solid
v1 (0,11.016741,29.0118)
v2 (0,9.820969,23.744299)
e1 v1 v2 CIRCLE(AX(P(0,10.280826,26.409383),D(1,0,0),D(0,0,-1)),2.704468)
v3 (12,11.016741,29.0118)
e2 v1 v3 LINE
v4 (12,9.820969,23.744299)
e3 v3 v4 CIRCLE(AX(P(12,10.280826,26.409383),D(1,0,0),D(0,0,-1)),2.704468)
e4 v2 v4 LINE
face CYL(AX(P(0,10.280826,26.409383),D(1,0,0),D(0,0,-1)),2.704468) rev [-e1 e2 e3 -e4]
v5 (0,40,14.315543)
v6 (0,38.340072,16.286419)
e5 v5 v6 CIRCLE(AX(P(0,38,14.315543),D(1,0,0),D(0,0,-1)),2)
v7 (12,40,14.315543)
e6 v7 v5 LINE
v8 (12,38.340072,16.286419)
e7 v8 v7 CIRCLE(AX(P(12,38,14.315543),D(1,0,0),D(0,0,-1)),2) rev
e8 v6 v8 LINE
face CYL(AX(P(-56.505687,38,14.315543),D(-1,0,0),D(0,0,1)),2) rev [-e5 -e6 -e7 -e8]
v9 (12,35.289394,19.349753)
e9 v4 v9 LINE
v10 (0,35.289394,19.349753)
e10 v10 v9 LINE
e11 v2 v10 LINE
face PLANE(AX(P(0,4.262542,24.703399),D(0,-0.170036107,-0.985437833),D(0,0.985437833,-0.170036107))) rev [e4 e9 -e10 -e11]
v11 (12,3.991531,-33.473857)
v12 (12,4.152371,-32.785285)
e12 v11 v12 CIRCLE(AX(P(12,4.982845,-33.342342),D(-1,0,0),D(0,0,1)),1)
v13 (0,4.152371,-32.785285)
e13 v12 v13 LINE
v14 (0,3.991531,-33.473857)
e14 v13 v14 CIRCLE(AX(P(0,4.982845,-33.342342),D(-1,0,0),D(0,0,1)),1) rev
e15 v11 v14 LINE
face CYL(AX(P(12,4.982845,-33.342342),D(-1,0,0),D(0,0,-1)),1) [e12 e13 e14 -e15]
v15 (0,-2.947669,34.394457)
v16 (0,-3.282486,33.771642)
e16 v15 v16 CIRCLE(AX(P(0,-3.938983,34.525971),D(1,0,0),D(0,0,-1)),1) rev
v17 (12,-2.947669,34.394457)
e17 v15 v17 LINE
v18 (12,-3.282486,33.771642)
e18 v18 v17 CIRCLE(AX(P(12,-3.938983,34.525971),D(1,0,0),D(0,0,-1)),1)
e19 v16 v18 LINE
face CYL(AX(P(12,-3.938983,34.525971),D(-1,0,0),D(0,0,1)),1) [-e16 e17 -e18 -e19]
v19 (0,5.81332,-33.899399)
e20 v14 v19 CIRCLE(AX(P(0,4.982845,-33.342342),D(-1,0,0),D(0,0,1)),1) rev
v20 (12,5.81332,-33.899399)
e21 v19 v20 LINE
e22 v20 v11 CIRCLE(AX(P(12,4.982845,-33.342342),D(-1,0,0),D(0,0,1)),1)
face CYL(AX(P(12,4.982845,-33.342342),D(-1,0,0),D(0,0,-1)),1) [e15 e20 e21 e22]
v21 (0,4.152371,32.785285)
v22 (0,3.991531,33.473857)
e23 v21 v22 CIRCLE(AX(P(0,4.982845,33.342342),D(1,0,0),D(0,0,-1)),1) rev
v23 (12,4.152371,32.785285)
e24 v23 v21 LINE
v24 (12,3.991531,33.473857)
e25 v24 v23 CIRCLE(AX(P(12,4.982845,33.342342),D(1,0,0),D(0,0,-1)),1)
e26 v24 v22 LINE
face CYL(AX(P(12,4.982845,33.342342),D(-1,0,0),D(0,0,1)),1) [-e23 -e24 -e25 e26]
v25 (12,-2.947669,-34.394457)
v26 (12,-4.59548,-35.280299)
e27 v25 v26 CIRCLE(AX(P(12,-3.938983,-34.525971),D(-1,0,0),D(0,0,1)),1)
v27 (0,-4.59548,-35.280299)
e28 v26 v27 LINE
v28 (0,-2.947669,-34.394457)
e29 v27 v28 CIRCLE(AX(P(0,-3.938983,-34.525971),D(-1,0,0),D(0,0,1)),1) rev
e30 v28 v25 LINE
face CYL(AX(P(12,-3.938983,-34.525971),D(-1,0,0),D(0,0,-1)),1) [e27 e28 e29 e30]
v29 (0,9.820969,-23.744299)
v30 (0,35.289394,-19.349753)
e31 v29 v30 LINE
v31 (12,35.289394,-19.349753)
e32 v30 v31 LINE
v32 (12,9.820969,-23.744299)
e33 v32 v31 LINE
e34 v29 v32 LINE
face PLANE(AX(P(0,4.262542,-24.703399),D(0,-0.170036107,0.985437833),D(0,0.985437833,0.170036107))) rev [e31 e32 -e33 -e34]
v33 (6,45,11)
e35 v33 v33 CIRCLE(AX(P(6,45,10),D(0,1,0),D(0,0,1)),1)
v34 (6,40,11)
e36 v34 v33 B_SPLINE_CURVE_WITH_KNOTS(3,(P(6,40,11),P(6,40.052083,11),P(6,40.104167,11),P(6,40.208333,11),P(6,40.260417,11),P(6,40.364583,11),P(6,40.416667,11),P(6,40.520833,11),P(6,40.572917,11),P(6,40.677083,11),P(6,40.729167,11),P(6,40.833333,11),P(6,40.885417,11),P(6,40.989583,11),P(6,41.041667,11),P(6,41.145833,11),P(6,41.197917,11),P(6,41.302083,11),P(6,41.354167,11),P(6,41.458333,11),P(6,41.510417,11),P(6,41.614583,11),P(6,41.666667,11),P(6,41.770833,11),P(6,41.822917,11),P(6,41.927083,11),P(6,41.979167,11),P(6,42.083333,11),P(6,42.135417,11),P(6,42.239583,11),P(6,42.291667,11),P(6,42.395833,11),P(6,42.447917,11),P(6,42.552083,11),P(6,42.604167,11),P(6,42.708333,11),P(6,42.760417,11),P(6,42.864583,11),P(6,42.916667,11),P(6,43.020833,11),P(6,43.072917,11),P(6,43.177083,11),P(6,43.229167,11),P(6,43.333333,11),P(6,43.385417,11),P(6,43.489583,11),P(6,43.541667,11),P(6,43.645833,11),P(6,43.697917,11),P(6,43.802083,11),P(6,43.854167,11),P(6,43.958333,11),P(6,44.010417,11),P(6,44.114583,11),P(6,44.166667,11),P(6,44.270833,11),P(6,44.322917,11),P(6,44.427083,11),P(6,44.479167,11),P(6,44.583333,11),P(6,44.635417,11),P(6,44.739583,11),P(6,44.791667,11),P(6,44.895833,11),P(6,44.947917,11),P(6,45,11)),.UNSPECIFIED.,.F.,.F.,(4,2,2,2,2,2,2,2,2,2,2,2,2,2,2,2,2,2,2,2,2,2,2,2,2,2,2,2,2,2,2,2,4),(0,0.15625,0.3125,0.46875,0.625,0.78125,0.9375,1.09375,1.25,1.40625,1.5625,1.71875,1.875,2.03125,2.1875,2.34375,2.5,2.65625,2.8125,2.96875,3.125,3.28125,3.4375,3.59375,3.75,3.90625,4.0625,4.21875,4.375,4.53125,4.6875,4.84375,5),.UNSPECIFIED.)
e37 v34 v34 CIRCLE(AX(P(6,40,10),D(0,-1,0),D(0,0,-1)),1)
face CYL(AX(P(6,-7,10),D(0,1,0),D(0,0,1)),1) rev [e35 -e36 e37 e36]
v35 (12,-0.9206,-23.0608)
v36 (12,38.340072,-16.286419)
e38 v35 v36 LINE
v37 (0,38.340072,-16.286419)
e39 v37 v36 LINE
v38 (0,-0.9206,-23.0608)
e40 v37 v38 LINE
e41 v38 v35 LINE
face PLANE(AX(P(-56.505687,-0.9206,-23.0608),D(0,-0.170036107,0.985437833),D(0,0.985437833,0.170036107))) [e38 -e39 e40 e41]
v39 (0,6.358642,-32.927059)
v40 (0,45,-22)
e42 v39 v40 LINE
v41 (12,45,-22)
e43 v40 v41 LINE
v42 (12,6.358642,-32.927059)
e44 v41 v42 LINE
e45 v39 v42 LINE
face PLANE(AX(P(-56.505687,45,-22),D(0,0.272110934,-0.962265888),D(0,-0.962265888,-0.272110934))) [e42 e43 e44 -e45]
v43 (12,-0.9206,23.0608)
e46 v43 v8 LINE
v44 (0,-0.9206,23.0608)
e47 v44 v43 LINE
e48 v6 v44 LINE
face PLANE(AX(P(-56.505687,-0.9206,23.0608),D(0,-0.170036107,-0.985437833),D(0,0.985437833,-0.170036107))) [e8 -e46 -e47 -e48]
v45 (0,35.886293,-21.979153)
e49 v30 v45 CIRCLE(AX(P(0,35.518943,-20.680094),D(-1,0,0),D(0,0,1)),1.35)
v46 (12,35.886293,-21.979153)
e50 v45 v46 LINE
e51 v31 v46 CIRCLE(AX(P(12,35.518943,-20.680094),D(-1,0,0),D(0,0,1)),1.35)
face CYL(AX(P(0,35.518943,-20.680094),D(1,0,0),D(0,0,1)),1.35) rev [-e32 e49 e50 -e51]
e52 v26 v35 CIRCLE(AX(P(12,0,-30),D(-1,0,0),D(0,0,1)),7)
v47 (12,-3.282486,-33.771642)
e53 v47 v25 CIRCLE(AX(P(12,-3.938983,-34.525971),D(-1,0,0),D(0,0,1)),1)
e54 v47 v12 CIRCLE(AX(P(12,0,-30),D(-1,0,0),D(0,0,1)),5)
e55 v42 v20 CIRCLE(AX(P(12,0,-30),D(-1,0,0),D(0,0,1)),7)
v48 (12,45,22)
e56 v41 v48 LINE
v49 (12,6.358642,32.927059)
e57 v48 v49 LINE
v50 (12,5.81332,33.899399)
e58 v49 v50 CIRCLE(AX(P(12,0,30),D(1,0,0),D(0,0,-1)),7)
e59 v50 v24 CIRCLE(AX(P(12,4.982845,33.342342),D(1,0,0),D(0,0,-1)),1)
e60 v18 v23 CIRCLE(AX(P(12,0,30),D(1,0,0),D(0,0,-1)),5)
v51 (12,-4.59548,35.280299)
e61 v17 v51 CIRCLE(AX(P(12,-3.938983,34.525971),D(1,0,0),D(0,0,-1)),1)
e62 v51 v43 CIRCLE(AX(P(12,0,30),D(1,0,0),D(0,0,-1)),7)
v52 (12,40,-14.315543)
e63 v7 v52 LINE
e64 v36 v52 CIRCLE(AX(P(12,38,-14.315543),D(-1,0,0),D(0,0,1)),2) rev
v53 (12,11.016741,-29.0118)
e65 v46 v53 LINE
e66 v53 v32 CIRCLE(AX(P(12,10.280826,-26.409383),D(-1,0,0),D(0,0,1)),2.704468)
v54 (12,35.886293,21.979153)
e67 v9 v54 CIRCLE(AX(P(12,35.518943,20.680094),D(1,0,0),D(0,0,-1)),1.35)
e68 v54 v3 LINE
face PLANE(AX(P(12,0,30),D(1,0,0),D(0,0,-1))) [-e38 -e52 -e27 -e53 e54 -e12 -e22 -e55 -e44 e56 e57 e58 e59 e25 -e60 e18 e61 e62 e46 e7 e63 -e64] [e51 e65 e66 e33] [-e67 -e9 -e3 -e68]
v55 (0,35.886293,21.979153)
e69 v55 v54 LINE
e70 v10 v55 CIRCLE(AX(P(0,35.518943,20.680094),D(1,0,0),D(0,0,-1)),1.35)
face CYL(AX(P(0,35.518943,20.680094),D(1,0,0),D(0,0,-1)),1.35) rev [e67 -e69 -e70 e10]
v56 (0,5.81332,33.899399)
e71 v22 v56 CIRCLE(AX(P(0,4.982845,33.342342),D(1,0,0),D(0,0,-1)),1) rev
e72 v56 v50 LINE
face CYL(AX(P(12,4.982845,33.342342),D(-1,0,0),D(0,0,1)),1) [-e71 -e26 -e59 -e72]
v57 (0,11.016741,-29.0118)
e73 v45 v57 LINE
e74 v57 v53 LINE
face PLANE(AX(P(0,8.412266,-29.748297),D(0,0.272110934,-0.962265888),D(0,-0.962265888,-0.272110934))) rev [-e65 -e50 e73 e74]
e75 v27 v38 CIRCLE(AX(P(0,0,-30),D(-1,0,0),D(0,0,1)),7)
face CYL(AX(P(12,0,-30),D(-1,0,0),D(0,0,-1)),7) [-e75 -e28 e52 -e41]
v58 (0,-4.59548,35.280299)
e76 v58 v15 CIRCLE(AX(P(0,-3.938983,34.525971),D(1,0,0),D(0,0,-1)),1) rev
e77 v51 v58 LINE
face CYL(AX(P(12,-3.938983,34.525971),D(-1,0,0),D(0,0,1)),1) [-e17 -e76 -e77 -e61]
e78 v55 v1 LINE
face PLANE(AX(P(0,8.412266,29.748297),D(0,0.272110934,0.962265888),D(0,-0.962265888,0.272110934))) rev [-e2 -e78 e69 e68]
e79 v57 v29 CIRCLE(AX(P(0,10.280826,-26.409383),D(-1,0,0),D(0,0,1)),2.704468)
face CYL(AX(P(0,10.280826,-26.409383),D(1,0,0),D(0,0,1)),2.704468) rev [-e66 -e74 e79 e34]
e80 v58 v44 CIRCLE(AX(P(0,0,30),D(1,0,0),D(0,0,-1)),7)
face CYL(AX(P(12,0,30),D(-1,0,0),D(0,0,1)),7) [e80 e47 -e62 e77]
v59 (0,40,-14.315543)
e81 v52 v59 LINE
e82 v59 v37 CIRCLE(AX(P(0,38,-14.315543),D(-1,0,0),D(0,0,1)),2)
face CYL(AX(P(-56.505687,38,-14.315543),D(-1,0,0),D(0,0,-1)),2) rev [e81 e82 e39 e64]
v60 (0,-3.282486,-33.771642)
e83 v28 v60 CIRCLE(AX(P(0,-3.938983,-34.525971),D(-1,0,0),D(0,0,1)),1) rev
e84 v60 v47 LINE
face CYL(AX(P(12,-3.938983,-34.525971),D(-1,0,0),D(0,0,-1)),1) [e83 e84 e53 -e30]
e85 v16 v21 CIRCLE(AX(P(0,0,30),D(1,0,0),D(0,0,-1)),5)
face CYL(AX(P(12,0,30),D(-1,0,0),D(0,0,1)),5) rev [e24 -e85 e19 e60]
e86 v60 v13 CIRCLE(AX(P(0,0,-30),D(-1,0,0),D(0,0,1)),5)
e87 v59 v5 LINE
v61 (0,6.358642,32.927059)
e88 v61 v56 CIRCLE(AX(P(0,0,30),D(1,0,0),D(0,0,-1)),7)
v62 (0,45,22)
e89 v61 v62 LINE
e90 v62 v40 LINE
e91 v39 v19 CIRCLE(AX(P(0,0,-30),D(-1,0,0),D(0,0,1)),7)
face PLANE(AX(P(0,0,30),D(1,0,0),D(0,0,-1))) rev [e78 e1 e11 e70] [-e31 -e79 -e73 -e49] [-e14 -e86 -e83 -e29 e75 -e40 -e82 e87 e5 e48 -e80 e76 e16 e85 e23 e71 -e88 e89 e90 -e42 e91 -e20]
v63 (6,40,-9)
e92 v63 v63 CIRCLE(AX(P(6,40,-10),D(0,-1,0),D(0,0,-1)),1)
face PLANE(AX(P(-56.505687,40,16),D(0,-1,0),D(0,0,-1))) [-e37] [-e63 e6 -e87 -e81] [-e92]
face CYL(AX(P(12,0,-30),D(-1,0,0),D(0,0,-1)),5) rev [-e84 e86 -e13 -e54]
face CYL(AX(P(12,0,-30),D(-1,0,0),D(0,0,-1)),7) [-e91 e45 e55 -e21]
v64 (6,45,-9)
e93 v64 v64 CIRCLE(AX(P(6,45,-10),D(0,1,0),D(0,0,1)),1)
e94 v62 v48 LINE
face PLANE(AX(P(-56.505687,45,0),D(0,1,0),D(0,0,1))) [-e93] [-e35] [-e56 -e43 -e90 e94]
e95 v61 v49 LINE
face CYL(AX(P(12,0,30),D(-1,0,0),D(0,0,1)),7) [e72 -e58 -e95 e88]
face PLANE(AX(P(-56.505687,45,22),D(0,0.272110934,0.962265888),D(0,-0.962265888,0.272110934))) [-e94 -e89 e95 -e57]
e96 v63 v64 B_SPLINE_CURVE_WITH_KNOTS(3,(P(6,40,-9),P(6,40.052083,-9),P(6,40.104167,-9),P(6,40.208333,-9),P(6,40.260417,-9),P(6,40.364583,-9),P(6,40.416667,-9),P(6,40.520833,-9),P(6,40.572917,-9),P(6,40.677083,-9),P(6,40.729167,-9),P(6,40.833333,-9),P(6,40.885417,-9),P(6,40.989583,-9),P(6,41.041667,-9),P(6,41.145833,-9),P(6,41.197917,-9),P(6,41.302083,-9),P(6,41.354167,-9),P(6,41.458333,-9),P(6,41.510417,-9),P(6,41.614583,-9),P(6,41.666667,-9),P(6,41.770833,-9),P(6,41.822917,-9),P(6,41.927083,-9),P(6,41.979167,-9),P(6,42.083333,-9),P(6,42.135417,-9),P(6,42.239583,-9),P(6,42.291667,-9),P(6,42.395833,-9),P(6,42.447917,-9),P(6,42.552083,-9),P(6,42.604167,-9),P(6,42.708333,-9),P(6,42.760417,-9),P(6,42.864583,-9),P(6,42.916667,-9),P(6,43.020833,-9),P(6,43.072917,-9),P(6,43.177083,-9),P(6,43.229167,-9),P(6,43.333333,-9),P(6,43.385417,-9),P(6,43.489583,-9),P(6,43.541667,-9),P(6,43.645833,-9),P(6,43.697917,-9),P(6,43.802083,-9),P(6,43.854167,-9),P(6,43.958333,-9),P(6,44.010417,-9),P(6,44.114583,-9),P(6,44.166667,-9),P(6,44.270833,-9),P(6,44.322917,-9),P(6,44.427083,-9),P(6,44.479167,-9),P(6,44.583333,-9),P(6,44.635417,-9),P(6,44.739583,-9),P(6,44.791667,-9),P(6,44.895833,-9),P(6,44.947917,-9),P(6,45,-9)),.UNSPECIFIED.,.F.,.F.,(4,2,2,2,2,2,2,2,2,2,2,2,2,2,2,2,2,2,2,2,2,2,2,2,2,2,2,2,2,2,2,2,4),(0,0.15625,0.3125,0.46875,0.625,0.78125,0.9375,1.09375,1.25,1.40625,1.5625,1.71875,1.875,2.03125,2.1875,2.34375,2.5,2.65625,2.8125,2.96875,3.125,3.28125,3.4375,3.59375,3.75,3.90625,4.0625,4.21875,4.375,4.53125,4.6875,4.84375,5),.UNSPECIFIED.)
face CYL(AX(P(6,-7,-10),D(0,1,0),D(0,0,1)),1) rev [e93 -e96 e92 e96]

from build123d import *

# Parameters (mm, degrees)
SKETCH1_R           = 7
SKETCH1_R_2         = 5
BOSS_EXTRUDE1_DEPTH = 12
CUT_EXTRUDE1_DEPTH  = 40.522145691
FILLET1_R           = 1
BOSS_EXTRUDE2_START = -12
BOSS_EXTRUDE2_DEPTH = 12
FILLET2_R           = 2
CUT_EXTRUDE2_DEPTH  = 59.575636594
SKETCH7_R           = 1
CUT_EXTRUDE3_DEPTH  = 65.110102187


with BuildPart() as part:
    # Sketch1 → Boss-Extrude1 (new body)
    with BuildSketch(Plane(origin=(0, 0, 0), x_dir=(0, 0, -1), z_dir=(1, 0, 0))):
        with Locations((-30, 0)):
            Circle(SKETCH1_R)
        with Locations((-30, 0)):
            Circle(SKETCH1_R_2, mode=Mode.SUBTRACT)
    extrude(amount=BOSS_EXTRUDE1_DEPTH)

    # Sketch3 → Cut-Extrude1 (cut, through all)
    with BuildSketch(Plane(origin=(12, 0, 0), x_dir=(0, 0, -1), z_dir=(1, 0, 0))):
        Polygon((-26, 3), (-26.92060006, -3.93919992), (-40.375880399, -2.154133626), (-39.455280339, 4.785066294), align=None)
    extrude(amount=-CUT_EXTRUDE1_DEPTH, mode=Mode.SUBTRACT)

    # Fillet1
    fillet1_edges = [part.edges().sort_by_distance(p)[0] for p in [
        (6, 3.93919992, 33.07939994),
        (6, 4.266862999, 35.549223383),
        (6, -3, 34),
        (6, -2.672336921, 36.469823443),
    ]]
    fillet(fillet1_edges, radius=FILLET1_R - 0.0001)  # a hair under: the kernel refuses the full size

    # Sketch4 → Boss-Extrude2 (add)
    with BuildSketch(Plane(origin=(12, 0, 0), x_dir=(0, 0, -1), z_dir=(1, 0, 0)).offset(BOSS_EXTRUDE2_START)):
        with BuildLine():
            Line((-23.06080008, -0.92060006), (-16, 40))
            Line((-16, 40), (0, 40))
            Line((0, 40), (0, 45))
            Line((0, 45), (-22, 45))
            Line((-22, 45), (-32.927058907, 6.358641848))
            ThreePointArc((-32.927058907, 6.358641848), (-25.844141537, 5.632835914), (-23.06080008, -0.92060006))
        make_face()
    extrude(amount=BOSS_EXTRUDE2_DEPTH)

    # Fillet2
    fillet2_edges = [part.edges().sort_by_distance(p)[0] for p in [
        (6, 40, 16),
    ]]
    fillet(fillet2_edges, radius=FILLET2_R)

    # Sketch6 → Cut-Extrude2 (cut, through all)
    with BuildSketch(Plane(origin=(12, 0, 0), x_dir=(0, 0, -1), z_dir=(1, 0, 0))):
        with BuildLine():
            Line((-23.744298761, 9.820968741), (-19.349752742, 35.289394134))
            ThreePointArc((-19.349752742, 35.289394134), (-20.381234985, 36.835447129), (-21.979152767, 35.886292641))
            Line((-21.979152767, 35.886292641), (-29.011800399, 11.016740989))
            ThreePointArc((-29.011800399, 11.016740989), (-27.008090108, 7.643460534), (-23.744298761, 9.820968741))
        make_face()
    extrude(amount=-CUT_EXTRUDE2_DEPTH, mode=Mode.SUBTRACT)

    # Mirror9: part across plane


with BuildPart() as part_1:
    add(part.part)
    add(part.part.mirror(Plane(origin=(-56.505687485, 40, 0), x_dir=(1, 0, 0), z_dir=(0, 0, -1))))

    # Sketch7 → Cut-Extrude3 (cut, through all)
    with BuildSketch(Plane(origin=(0, 45, 0), x_dir=(1, 0, 0), z_dir=(0, 1, 0))):
        with Locations(Location((6, -10, 0), (0, 0, 270))):
            Circle(SKETCH7_R)
        with Locations(Location((6, 10, 0), (0, 0, 270))):
            Circle(SKETCH7_R)
    extrude(amount=-CUT_EXTRUDE3_DEPTH, mode=Mode.SUBTRACT)


solid = part_1.part
